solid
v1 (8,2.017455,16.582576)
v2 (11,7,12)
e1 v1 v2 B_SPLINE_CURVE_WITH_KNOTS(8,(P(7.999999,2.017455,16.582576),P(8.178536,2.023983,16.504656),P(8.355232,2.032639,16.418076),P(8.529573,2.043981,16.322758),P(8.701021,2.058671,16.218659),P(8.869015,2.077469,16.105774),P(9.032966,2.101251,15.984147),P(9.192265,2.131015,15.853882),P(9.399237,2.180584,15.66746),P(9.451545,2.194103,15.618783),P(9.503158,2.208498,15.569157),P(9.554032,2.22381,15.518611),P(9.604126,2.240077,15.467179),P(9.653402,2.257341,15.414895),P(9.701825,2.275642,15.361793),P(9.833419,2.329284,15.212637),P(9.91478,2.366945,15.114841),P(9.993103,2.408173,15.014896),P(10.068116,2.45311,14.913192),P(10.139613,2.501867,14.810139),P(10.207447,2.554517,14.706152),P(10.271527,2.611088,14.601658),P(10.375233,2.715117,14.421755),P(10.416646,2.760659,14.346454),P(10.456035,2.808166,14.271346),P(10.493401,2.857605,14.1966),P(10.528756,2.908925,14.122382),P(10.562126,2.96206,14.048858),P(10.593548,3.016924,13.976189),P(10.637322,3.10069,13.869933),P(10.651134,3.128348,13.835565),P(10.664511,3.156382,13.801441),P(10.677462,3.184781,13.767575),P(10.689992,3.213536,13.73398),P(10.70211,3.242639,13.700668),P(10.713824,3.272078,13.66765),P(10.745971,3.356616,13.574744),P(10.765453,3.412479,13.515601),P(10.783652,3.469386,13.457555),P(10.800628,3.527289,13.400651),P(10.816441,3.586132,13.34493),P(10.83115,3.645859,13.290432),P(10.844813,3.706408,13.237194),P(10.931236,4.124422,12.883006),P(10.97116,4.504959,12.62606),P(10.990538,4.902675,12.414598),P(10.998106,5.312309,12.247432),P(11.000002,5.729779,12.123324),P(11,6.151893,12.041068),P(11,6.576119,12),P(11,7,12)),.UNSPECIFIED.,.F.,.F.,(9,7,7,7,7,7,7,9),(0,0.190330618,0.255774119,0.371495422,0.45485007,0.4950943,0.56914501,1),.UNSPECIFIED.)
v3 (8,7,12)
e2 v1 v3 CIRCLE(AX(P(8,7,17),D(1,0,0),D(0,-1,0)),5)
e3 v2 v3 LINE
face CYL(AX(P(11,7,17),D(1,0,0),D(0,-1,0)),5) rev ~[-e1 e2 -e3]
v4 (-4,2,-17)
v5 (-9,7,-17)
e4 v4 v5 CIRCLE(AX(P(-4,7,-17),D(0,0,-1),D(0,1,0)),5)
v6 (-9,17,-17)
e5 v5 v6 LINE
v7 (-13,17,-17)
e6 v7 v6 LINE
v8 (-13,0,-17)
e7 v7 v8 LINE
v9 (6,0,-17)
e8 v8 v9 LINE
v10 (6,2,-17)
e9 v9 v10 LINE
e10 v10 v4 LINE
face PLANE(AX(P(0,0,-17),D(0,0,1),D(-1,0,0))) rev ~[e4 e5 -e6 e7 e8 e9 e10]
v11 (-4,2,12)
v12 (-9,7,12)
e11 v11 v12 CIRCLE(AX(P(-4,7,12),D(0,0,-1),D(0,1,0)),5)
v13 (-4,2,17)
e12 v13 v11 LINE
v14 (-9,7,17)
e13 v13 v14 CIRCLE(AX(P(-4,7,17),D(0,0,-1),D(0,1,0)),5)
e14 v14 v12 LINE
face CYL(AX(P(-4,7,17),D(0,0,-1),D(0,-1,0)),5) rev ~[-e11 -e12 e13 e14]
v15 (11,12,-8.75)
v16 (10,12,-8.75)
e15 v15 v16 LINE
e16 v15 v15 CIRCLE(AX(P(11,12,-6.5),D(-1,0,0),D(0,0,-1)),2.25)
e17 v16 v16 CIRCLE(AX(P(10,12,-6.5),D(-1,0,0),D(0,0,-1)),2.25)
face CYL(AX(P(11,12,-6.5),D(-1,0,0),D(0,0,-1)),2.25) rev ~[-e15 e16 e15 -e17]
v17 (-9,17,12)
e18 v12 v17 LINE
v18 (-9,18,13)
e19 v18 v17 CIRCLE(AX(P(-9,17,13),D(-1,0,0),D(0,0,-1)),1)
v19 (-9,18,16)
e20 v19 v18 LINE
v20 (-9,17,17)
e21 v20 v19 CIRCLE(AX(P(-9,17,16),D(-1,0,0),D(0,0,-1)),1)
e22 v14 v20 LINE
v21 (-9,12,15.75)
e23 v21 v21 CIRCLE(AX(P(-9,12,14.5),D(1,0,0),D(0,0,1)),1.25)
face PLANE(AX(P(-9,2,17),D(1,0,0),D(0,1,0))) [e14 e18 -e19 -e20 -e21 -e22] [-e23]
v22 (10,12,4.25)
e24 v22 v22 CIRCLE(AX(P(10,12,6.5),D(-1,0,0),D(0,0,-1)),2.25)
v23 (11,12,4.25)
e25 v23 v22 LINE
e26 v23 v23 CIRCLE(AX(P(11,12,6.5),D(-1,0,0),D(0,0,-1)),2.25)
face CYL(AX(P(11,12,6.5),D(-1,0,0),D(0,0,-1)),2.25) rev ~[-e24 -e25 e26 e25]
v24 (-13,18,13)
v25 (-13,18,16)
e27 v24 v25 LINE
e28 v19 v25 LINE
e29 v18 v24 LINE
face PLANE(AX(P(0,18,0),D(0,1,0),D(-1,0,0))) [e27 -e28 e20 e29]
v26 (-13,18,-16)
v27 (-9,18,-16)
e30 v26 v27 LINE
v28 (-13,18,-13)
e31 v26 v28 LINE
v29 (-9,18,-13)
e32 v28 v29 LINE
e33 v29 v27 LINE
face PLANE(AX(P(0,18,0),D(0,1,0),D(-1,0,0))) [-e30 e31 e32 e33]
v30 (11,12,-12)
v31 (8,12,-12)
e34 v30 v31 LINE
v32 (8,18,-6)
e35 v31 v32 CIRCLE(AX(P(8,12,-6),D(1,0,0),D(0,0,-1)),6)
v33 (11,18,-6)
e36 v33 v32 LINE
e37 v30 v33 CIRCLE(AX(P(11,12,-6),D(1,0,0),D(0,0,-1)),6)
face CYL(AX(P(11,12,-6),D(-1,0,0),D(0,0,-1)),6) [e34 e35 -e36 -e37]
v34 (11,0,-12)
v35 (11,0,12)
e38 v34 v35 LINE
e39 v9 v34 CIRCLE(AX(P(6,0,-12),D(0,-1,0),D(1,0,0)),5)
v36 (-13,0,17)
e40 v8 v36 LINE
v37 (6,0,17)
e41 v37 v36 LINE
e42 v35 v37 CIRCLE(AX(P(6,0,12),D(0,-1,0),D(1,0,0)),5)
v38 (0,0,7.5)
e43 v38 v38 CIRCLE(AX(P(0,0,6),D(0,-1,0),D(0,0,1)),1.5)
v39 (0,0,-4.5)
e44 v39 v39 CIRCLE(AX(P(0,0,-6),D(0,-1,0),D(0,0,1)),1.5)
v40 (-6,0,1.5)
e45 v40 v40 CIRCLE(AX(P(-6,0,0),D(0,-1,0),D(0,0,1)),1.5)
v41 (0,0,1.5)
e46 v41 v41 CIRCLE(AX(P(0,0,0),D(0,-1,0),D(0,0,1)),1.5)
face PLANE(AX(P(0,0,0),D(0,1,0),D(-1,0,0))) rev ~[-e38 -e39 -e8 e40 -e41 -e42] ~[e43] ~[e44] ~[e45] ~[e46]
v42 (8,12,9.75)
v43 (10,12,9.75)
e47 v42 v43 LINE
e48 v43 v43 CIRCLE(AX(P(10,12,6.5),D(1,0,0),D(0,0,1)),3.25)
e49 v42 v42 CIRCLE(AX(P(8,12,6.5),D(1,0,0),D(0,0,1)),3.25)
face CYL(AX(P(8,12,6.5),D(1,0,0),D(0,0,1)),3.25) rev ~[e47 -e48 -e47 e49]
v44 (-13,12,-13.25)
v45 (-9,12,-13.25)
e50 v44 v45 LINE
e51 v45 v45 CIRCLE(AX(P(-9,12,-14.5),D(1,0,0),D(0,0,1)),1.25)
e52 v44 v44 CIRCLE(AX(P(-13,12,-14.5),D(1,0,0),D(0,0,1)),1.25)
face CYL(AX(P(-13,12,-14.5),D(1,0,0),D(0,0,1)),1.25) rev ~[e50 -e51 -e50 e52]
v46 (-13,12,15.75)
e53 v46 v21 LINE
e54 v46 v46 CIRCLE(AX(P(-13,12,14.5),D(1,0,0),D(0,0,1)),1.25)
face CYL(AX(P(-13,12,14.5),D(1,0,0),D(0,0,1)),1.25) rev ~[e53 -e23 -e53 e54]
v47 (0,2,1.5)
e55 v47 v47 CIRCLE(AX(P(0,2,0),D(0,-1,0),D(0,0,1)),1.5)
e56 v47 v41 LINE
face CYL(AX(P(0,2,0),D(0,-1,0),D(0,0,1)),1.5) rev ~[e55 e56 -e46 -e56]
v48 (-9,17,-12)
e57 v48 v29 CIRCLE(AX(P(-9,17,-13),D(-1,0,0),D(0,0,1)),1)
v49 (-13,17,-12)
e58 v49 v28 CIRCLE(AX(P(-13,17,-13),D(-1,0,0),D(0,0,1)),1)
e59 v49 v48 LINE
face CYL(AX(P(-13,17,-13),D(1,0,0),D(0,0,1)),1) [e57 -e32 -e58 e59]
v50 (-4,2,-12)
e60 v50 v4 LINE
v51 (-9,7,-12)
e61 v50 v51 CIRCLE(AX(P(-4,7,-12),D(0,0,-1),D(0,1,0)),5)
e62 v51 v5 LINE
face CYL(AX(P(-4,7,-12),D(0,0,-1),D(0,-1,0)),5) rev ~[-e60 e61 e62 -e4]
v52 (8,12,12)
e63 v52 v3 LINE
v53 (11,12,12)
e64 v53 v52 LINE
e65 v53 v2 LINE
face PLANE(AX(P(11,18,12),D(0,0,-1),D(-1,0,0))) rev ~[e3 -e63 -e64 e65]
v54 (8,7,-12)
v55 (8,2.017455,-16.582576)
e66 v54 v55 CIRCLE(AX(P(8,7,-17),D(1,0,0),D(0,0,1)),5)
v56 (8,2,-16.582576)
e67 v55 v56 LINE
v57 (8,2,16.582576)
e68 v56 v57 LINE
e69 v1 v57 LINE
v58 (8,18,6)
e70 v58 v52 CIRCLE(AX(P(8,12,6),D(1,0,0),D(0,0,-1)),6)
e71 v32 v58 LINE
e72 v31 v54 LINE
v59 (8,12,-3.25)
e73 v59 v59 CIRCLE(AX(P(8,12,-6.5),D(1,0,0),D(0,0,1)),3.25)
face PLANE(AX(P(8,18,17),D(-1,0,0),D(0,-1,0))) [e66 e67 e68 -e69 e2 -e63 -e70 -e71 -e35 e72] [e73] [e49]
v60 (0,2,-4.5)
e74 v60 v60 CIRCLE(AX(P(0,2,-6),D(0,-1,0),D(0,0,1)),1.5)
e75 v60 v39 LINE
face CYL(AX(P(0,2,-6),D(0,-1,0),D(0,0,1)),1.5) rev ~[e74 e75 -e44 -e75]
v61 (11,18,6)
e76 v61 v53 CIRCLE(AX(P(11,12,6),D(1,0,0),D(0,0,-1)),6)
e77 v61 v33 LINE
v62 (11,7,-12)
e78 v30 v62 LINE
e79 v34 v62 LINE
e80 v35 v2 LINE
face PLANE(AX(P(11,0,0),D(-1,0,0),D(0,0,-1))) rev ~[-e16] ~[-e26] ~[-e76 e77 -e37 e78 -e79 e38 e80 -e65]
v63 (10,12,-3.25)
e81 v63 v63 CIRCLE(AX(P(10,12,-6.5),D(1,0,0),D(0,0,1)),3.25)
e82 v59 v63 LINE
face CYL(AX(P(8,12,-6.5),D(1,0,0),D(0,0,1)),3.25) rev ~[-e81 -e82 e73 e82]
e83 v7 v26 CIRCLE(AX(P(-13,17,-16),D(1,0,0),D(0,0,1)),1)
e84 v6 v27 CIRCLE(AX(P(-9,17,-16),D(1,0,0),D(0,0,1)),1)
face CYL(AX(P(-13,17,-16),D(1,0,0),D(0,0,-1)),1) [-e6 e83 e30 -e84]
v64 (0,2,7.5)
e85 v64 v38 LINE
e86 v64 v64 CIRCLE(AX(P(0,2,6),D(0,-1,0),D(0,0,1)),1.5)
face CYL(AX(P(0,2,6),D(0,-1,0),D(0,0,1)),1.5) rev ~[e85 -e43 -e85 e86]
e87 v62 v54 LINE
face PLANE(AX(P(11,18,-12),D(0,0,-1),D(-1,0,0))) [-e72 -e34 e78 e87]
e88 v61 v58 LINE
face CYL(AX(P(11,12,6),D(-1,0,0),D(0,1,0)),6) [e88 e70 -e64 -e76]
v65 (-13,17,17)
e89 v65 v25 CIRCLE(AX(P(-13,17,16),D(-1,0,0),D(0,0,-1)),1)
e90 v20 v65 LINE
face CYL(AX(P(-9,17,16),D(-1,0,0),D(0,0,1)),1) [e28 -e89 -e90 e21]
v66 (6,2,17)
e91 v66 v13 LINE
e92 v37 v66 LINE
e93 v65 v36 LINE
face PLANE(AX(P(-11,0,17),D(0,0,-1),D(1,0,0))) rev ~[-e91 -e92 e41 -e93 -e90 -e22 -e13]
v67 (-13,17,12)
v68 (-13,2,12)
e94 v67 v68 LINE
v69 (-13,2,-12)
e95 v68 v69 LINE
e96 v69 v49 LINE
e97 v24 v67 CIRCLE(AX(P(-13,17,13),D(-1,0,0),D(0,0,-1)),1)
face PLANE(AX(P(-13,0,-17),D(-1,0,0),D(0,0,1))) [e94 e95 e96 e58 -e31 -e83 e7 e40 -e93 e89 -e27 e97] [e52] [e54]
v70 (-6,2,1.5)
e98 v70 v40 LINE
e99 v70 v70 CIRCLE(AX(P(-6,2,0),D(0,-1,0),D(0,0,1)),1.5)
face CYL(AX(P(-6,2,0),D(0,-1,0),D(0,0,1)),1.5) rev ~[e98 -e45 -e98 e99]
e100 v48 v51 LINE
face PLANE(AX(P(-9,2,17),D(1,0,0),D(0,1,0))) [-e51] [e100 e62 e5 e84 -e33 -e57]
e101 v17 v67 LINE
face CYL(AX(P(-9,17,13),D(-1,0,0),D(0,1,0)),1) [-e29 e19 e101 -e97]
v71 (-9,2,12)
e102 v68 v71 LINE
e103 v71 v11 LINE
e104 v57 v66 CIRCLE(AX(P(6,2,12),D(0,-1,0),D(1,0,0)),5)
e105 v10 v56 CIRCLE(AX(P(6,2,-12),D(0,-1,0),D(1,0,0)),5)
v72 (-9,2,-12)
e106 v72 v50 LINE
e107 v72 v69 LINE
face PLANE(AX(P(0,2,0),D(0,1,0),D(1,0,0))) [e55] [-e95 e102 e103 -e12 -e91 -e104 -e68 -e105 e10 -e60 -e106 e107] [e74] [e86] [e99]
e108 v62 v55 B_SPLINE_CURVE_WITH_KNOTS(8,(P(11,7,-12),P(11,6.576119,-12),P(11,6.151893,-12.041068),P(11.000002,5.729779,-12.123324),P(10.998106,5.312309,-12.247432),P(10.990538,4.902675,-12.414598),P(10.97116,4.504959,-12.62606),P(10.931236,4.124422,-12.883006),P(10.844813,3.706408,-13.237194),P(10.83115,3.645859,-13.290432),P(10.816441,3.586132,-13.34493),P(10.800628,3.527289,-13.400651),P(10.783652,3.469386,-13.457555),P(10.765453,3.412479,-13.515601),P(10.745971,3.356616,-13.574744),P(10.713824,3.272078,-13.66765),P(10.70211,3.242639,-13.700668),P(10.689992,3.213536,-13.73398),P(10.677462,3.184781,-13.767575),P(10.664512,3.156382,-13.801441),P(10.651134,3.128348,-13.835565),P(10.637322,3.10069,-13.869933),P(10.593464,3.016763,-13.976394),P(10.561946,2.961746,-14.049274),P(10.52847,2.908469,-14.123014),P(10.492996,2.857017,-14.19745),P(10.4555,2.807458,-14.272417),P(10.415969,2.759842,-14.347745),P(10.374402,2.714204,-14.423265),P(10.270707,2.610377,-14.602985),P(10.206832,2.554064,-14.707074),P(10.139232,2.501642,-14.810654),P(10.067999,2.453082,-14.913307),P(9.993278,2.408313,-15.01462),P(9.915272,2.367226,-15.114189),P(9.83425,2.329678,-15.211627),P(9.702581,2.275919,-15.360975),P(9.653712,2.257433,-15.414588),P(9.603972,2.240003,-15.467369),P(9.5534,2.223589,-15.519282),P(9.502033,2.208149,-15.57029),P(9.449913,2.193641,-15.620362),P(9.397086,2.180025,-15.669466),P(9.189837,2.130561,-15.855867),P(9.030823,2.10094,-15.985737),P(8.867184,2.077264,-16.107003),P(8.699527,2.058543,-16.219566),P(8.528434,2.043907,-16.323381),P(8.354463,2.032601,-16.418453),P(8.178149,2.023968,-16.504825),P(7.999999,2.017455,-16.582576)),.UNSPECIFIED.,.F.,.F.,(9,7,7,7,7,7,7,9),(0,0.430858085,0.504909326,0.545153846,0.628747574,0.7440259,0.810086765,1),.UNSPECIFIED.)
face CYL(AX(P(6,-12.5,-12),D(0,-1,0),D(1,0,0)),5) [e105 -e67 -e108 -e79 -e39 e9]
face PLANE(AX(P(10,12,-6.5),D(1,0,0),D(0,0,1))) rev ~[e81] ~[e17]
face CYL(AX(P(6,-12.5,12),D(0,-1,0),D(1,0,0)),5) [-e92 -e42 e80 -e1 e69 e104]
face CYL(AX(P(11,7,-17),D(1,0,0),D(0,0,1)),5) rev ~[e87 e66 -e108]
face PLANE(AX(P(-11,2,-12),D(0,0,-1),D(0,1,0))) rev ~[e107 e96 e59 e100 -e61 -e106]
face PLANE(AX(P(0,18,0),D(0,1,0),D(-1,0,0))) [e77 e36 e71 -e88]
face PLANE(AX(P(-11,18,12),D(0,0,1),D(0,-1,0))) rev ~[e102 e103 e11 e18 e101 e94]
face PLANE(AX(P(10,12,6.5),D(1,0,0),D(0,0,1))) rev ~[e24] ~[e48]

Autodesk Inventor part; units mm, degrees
ref_plane "YZ Plane" through (0, 0, 0) normal (1, 0, 0) x (0, 1, 0)
ref_plane "XZ Plane" through (0, 0, 0) normal (0, 1, 0) x (-1, 0, 0)
ref_plane "XY Plane" through (0, 0, 0) normal (0, 0, 1) x (1, 0, 0)
sketch "Sketch1" plane through (0, 0, 0) normal (0, 1, 0) x (-1, 0, 0)
  line L0 (15.4, 0) -> (-15.4, 0) projected
  line L1 (0, -23.8) -> (0, 23.8) projected
  line L2 (11, 17) -> (-11, 17)
  line L3 (-11, 17) -> (-11, -17)
  line L4 (-11, -17) -> (11, -17)
  line L5 (11, -17) -> (11, 17)
  point P0 (0, 0)
  dimension "d0" = 22
  dimension "d1" = 34
extrude "Extrusion1" add sketch "Sketch1" along normal blind 18
sketch "Sketch2" plane through (0, 18, 0) normal (0, 1, 0) x (1, 0, 0)
  line L0 (-11, -12) -> (8, -12)
  line L1 (8, -12) -> (8, 12)
  line L2 (8, 12) -> (-11, 12)
  line L3 (-11, 12) -> (-11, -12)
  line L4 (-11, -17) -> (11, -17) projected
  line L5 (11, -17) -> (11, 17) projected
  line L6 (11, 17) -> (-11, 17) projected
  line L7 (-11, 17) -> (-11, -17) projected
  line L8 (-15.4, 0) -> (15.4, 0) projected
  point P0 (0, 0)
  dimension "d5" = 24
  dimension "d6" = 3
extrude "Extrusion2" cut sketch "Sketch2" against normal blind 16 contours L3 L8 L1 L0 | L3 L2 L1 L8
sketch "Sketch3" plane through (-11, 0, 17) normal (0, 0, 1) x (1, 0, 0)
  line L0 (4, 18) -> (19, 18)
  line L1 (19, 18) -> (19, 2)
  line L2 (19, 2) -> (4, 2)
  line L3 (4, 2) -> (4, 18)
  line L4 (0, 18) -> (22, 18) projected
  line L5 (0, 0) -> (0, 18) projected
  line L6 (22, 0) -> (22, 18) projected
  line L7 (0, 0) -> (22, 0) projected
  point P0 (11, 0)
  dimension "d9" = 4
  dimension "d10" = 3
  dimension "d11" = 2
extrude "Extrusion3" cut sketch "Sketch3" against normal through all contours L0 L1 L2 L3
sketch "Sketch6" plane through (0, 2, 0) normal (0, 1, 0) x (1, 0, 0)
  line L0 (-11, 12) -> (-7, 12) projected
  line L1 (-11, -12) -> (-11, 12) projected
  line L2 (-7, -12) -> (-11, -12) projected
  line L3 (-7, -17) -> (-7, -12) projected
  line L4 (8, -17) -> (-7, -17) projected
  line L5 (-7, 17) -> (8, 17) projected
  line L6 (-7, 12) -> (-7, 17) projected
  line L7 (-15.4, 0) -> (15.4, 0) projected
  line L8 (0, 23.8) -> (0, -23.8) projected
  line L9 (8, -17) -> (8, 17) projected
  point P0 (0, 0)
  point P1 (0, 0)
  point P2 (0, 6)
  point P3 (0, -6)
  point P4 (-6, 0)
  dimension "d15" = 6
  dimension "d16" = 6
  dimension "d18" = 6
hole "Hole1" at (0, 2, -6) at (0, 2, 0) at (0, 2, 6) at (-6, 2, 0) direction (0, -1, 0) diameter 3 end through all
sketch "Sketch8" plane through (11, 0, 17) normal (1, 0, 0) x (0, 0, -1)
  line L0 (0, 0) -> (34, 0) projected
  line L1 (34, 0) -> (34, 18) projected
  line L2 (0, 18) -> (34, 18) projected
  line L3 (0, 0) -> (0, 18) projected
  line L4 (29, 2) -> (29, 18) projected
  line L5 (5, 18) -> (5, 2) projected
  line L6 (29, 2) -> (5, 2) projected
  point P0 (17, 0)
  point P1 (0, 2)
  point P2 (34, 2)
  point P3 (23.5, 12)
  point P4 (10.5, 12)
  dimension "d28" = 5.5
  dimension "d29" = 5.5
  dimension "d30" = 6
  dimension "d31" = 6
hole "Hole2" at (11, 12, -6.5) at (11, 12, 6.5) direction (-1, 0, 0) diameter 4.5 end through all
sketch "Sketch12" plane through (0, 18, 0) normal (0, 1, 0) x (1, 0, 0)
  line L0 (8, 17) -> (8, -17) projected
  line L1 (8, -17) -> (11, -17) projected
  line L2 (11, -17) -> (11, 17) projected
  line L3 (11, 17) -> (8, 17) projected
  line L4 (8, -17) -> (11, -17)
  line L5 (11, -17) -> (11, -12)
  line L6 (11, -12) -> (8, -12)
  line L7 (8, -12) -> (8, -17)
  line L8 (8, 17) -> (11, 17)
  line L9 (11, 17) -> (11, 12)
  line L10 (11, 12) -> (8, 12)
  line L11 (8, 12) -> (8, 17)
  line L12 (-7, -17) -> (-7, -12) projected
  line L13 (-7, -12) -> (-11, -12) projected
  line L14 (-11, -12) -> (-11, -17) projected
  line L15 (-11, -17) -> (-7, -17) projected
  line L16 (-7, 12) -> (-7, 17) projected
  line L17 (-7, 17) -> (-11, 17) projected
  line L18 (-11, 17) -> (-11, 12) projected
  line L19 (-11, 12) -> (-7, 12) projected
  point P0 (0, 0)
extrude "Extrusion5" cut sketch "Sketch12" against normal blind 16 contours L3 L2 L10 L0 | L6 L2 L1 L0
sketch "Sketch17" plane through (-11, 0, -17) normal (-1, 0, 0) x (0, 0, 1)
  line L0 (29, 18) -> (29, 2) projected
  line L1 (29, 2) -> (5, 2) projected
  line L2 (5, 2) -> (5, 18) projected
  line L3 (0, 18) -> (5, 18) projected
  line L4 (0, 0) -> (0, 18) projected
  line L5 (0, 0) -> (34, 0) projected
  line L6 (34, 0) -> (34, 18) projected
  line L7 (29, 18) -> (34, 18) projected
  line L8 (34, 0) -> (0, 0) projected
  line L9 (29, 18) -> (29, 2) projected
  line L10 (34, 0) -> (29, 0)
  line L11 (29, 0) -> (29, 18)
  line L12 (29, 18) -> (34, 18)
  line L13 (34, 18) -> (34, 0)
  line L14 (0, 18) -> (5, 18) projected
  line L15 (0, 0) -> (5, 0)
  line L16 (5, 0) -> (5, 18)
  line L17 (5, 18) -> (0, 18)
  line L18 (0, 18) -> (0, 0)
  line L19 (0, 2) -> (5, 2) projected
  line L20 (34, 0) -> (0, 0)
  line L21 (0, 0) -> (0, 2)
  line L22 (0, 2) -> (34, 2)
  line L23 (34, 2) -> (34, 0)
  point P0 (17, 0)
extrude "Extrusion6" add sketch "Sketch17" along normal blind 2
sketch "Sketch19" plane through (8, 18, -12) normal (-1, 0, 0) x (0, 0, 1)
  circle A0 centre (18.5, -6) radius 2.25 projected
  circle A1 centre (5.5, -6) radius 2.25 projected
  line L0 (24, -16) -> (24, 0) projected
  line L1 (0, 0) -> (24, 0) projected
  line L2 (0, 0) -> (0, -16) projected
  line L3 (24, -16) -> (0, -16) projected
  point P0 (12, -18)
hole "Hole4" at (8, 12, 6.5) at (8, 12, -6.5) direction (1, 0, 0) diameter 6.5 depth 2
fillet "Fillet9" radius 6 2 edges at (9.5, 18, -12) (9.5, 18, 12)
fillet "Fillet10" radius 5 4 edges at (9.5, 2, 12) (9.5, 2, -12) (11, 1, 17) (11, 1, -17)
sketch "Sketch20" plane through (-13, 0, -17) normal (-1, 0, 0) x (0, 0, 1)
  line L0 (0, 0) -> (34, 0) projected
  line L1 (34, 0) -> (34, 18) projected
  line L2 (34, 18) -> (29, 18) projected
  line L3 (29, 18) -> (29, 2) projected
  line L4 (29, 2) -> (5, 2) projected
  line L5 (5, 2) -> (5, 18) projected
  line L6 (5, 18) -> (0, 18) projected
  line L7 (0, 18) -> (0, 0) projected
  point P0 (17, 0)
  point P1 (2.5, 12)
  point P2 (31.5, 12)
  dimension "d85" = 6
  dimension "d86" = 2.5
  dimension "d87" = 2.5
  dimension "d88" = 6
hole "Hole5" at (-13, 12, -14.5) at (-13, 12, 14.5) direction (1, 0, 0) diameter 2.5 end through all
sketch "Sketch21" plane through (-7, 2, 17) normal (0, 0, 1) x (1, 0, 0)
  line L0 (-2, 16) -> (0, 16)
  line L1 (0, 16) -> (0, 0)
  line L2 (0, 0) -> (-2, 0)
  line L3 (-2, 0) -> (-2, 16)
  line L4 (13, 0) -> (13, -2) projected
  line L5 (13, 0) -> (0, 0) projected
  line L6 (0, 0) -> (0, 16) projected
  line L7 (0, 16) -> (-6, 16) projected
  line L8 (-6, -2) -> (-6, 16) projected
  line L9 (-6, -2) -> (13, -2) projected
  line L10 (13, 0) -> (0, 0) projected
  line L11 (0, 16) -> (-6, 16) projected
  line L12 (0, 0) -> (0, 16) projected
  point P0 (7, -2)
  dimension "d96" = 4
extrude "Extrusion7" cut sketch "Sketch21" against normal through all contours L0 L1 L2 L3
fillet "Fillet11" radius 5 2 edges at (-9, 2, 14.5) (-9, 2, -14.5)
fillet "Fillet12" radius 1 4 edges at (-11, 18, 17) (-11, 18, 12) (-11, 18, -12) (-11, 18, -17)
properties part number "bracket"
